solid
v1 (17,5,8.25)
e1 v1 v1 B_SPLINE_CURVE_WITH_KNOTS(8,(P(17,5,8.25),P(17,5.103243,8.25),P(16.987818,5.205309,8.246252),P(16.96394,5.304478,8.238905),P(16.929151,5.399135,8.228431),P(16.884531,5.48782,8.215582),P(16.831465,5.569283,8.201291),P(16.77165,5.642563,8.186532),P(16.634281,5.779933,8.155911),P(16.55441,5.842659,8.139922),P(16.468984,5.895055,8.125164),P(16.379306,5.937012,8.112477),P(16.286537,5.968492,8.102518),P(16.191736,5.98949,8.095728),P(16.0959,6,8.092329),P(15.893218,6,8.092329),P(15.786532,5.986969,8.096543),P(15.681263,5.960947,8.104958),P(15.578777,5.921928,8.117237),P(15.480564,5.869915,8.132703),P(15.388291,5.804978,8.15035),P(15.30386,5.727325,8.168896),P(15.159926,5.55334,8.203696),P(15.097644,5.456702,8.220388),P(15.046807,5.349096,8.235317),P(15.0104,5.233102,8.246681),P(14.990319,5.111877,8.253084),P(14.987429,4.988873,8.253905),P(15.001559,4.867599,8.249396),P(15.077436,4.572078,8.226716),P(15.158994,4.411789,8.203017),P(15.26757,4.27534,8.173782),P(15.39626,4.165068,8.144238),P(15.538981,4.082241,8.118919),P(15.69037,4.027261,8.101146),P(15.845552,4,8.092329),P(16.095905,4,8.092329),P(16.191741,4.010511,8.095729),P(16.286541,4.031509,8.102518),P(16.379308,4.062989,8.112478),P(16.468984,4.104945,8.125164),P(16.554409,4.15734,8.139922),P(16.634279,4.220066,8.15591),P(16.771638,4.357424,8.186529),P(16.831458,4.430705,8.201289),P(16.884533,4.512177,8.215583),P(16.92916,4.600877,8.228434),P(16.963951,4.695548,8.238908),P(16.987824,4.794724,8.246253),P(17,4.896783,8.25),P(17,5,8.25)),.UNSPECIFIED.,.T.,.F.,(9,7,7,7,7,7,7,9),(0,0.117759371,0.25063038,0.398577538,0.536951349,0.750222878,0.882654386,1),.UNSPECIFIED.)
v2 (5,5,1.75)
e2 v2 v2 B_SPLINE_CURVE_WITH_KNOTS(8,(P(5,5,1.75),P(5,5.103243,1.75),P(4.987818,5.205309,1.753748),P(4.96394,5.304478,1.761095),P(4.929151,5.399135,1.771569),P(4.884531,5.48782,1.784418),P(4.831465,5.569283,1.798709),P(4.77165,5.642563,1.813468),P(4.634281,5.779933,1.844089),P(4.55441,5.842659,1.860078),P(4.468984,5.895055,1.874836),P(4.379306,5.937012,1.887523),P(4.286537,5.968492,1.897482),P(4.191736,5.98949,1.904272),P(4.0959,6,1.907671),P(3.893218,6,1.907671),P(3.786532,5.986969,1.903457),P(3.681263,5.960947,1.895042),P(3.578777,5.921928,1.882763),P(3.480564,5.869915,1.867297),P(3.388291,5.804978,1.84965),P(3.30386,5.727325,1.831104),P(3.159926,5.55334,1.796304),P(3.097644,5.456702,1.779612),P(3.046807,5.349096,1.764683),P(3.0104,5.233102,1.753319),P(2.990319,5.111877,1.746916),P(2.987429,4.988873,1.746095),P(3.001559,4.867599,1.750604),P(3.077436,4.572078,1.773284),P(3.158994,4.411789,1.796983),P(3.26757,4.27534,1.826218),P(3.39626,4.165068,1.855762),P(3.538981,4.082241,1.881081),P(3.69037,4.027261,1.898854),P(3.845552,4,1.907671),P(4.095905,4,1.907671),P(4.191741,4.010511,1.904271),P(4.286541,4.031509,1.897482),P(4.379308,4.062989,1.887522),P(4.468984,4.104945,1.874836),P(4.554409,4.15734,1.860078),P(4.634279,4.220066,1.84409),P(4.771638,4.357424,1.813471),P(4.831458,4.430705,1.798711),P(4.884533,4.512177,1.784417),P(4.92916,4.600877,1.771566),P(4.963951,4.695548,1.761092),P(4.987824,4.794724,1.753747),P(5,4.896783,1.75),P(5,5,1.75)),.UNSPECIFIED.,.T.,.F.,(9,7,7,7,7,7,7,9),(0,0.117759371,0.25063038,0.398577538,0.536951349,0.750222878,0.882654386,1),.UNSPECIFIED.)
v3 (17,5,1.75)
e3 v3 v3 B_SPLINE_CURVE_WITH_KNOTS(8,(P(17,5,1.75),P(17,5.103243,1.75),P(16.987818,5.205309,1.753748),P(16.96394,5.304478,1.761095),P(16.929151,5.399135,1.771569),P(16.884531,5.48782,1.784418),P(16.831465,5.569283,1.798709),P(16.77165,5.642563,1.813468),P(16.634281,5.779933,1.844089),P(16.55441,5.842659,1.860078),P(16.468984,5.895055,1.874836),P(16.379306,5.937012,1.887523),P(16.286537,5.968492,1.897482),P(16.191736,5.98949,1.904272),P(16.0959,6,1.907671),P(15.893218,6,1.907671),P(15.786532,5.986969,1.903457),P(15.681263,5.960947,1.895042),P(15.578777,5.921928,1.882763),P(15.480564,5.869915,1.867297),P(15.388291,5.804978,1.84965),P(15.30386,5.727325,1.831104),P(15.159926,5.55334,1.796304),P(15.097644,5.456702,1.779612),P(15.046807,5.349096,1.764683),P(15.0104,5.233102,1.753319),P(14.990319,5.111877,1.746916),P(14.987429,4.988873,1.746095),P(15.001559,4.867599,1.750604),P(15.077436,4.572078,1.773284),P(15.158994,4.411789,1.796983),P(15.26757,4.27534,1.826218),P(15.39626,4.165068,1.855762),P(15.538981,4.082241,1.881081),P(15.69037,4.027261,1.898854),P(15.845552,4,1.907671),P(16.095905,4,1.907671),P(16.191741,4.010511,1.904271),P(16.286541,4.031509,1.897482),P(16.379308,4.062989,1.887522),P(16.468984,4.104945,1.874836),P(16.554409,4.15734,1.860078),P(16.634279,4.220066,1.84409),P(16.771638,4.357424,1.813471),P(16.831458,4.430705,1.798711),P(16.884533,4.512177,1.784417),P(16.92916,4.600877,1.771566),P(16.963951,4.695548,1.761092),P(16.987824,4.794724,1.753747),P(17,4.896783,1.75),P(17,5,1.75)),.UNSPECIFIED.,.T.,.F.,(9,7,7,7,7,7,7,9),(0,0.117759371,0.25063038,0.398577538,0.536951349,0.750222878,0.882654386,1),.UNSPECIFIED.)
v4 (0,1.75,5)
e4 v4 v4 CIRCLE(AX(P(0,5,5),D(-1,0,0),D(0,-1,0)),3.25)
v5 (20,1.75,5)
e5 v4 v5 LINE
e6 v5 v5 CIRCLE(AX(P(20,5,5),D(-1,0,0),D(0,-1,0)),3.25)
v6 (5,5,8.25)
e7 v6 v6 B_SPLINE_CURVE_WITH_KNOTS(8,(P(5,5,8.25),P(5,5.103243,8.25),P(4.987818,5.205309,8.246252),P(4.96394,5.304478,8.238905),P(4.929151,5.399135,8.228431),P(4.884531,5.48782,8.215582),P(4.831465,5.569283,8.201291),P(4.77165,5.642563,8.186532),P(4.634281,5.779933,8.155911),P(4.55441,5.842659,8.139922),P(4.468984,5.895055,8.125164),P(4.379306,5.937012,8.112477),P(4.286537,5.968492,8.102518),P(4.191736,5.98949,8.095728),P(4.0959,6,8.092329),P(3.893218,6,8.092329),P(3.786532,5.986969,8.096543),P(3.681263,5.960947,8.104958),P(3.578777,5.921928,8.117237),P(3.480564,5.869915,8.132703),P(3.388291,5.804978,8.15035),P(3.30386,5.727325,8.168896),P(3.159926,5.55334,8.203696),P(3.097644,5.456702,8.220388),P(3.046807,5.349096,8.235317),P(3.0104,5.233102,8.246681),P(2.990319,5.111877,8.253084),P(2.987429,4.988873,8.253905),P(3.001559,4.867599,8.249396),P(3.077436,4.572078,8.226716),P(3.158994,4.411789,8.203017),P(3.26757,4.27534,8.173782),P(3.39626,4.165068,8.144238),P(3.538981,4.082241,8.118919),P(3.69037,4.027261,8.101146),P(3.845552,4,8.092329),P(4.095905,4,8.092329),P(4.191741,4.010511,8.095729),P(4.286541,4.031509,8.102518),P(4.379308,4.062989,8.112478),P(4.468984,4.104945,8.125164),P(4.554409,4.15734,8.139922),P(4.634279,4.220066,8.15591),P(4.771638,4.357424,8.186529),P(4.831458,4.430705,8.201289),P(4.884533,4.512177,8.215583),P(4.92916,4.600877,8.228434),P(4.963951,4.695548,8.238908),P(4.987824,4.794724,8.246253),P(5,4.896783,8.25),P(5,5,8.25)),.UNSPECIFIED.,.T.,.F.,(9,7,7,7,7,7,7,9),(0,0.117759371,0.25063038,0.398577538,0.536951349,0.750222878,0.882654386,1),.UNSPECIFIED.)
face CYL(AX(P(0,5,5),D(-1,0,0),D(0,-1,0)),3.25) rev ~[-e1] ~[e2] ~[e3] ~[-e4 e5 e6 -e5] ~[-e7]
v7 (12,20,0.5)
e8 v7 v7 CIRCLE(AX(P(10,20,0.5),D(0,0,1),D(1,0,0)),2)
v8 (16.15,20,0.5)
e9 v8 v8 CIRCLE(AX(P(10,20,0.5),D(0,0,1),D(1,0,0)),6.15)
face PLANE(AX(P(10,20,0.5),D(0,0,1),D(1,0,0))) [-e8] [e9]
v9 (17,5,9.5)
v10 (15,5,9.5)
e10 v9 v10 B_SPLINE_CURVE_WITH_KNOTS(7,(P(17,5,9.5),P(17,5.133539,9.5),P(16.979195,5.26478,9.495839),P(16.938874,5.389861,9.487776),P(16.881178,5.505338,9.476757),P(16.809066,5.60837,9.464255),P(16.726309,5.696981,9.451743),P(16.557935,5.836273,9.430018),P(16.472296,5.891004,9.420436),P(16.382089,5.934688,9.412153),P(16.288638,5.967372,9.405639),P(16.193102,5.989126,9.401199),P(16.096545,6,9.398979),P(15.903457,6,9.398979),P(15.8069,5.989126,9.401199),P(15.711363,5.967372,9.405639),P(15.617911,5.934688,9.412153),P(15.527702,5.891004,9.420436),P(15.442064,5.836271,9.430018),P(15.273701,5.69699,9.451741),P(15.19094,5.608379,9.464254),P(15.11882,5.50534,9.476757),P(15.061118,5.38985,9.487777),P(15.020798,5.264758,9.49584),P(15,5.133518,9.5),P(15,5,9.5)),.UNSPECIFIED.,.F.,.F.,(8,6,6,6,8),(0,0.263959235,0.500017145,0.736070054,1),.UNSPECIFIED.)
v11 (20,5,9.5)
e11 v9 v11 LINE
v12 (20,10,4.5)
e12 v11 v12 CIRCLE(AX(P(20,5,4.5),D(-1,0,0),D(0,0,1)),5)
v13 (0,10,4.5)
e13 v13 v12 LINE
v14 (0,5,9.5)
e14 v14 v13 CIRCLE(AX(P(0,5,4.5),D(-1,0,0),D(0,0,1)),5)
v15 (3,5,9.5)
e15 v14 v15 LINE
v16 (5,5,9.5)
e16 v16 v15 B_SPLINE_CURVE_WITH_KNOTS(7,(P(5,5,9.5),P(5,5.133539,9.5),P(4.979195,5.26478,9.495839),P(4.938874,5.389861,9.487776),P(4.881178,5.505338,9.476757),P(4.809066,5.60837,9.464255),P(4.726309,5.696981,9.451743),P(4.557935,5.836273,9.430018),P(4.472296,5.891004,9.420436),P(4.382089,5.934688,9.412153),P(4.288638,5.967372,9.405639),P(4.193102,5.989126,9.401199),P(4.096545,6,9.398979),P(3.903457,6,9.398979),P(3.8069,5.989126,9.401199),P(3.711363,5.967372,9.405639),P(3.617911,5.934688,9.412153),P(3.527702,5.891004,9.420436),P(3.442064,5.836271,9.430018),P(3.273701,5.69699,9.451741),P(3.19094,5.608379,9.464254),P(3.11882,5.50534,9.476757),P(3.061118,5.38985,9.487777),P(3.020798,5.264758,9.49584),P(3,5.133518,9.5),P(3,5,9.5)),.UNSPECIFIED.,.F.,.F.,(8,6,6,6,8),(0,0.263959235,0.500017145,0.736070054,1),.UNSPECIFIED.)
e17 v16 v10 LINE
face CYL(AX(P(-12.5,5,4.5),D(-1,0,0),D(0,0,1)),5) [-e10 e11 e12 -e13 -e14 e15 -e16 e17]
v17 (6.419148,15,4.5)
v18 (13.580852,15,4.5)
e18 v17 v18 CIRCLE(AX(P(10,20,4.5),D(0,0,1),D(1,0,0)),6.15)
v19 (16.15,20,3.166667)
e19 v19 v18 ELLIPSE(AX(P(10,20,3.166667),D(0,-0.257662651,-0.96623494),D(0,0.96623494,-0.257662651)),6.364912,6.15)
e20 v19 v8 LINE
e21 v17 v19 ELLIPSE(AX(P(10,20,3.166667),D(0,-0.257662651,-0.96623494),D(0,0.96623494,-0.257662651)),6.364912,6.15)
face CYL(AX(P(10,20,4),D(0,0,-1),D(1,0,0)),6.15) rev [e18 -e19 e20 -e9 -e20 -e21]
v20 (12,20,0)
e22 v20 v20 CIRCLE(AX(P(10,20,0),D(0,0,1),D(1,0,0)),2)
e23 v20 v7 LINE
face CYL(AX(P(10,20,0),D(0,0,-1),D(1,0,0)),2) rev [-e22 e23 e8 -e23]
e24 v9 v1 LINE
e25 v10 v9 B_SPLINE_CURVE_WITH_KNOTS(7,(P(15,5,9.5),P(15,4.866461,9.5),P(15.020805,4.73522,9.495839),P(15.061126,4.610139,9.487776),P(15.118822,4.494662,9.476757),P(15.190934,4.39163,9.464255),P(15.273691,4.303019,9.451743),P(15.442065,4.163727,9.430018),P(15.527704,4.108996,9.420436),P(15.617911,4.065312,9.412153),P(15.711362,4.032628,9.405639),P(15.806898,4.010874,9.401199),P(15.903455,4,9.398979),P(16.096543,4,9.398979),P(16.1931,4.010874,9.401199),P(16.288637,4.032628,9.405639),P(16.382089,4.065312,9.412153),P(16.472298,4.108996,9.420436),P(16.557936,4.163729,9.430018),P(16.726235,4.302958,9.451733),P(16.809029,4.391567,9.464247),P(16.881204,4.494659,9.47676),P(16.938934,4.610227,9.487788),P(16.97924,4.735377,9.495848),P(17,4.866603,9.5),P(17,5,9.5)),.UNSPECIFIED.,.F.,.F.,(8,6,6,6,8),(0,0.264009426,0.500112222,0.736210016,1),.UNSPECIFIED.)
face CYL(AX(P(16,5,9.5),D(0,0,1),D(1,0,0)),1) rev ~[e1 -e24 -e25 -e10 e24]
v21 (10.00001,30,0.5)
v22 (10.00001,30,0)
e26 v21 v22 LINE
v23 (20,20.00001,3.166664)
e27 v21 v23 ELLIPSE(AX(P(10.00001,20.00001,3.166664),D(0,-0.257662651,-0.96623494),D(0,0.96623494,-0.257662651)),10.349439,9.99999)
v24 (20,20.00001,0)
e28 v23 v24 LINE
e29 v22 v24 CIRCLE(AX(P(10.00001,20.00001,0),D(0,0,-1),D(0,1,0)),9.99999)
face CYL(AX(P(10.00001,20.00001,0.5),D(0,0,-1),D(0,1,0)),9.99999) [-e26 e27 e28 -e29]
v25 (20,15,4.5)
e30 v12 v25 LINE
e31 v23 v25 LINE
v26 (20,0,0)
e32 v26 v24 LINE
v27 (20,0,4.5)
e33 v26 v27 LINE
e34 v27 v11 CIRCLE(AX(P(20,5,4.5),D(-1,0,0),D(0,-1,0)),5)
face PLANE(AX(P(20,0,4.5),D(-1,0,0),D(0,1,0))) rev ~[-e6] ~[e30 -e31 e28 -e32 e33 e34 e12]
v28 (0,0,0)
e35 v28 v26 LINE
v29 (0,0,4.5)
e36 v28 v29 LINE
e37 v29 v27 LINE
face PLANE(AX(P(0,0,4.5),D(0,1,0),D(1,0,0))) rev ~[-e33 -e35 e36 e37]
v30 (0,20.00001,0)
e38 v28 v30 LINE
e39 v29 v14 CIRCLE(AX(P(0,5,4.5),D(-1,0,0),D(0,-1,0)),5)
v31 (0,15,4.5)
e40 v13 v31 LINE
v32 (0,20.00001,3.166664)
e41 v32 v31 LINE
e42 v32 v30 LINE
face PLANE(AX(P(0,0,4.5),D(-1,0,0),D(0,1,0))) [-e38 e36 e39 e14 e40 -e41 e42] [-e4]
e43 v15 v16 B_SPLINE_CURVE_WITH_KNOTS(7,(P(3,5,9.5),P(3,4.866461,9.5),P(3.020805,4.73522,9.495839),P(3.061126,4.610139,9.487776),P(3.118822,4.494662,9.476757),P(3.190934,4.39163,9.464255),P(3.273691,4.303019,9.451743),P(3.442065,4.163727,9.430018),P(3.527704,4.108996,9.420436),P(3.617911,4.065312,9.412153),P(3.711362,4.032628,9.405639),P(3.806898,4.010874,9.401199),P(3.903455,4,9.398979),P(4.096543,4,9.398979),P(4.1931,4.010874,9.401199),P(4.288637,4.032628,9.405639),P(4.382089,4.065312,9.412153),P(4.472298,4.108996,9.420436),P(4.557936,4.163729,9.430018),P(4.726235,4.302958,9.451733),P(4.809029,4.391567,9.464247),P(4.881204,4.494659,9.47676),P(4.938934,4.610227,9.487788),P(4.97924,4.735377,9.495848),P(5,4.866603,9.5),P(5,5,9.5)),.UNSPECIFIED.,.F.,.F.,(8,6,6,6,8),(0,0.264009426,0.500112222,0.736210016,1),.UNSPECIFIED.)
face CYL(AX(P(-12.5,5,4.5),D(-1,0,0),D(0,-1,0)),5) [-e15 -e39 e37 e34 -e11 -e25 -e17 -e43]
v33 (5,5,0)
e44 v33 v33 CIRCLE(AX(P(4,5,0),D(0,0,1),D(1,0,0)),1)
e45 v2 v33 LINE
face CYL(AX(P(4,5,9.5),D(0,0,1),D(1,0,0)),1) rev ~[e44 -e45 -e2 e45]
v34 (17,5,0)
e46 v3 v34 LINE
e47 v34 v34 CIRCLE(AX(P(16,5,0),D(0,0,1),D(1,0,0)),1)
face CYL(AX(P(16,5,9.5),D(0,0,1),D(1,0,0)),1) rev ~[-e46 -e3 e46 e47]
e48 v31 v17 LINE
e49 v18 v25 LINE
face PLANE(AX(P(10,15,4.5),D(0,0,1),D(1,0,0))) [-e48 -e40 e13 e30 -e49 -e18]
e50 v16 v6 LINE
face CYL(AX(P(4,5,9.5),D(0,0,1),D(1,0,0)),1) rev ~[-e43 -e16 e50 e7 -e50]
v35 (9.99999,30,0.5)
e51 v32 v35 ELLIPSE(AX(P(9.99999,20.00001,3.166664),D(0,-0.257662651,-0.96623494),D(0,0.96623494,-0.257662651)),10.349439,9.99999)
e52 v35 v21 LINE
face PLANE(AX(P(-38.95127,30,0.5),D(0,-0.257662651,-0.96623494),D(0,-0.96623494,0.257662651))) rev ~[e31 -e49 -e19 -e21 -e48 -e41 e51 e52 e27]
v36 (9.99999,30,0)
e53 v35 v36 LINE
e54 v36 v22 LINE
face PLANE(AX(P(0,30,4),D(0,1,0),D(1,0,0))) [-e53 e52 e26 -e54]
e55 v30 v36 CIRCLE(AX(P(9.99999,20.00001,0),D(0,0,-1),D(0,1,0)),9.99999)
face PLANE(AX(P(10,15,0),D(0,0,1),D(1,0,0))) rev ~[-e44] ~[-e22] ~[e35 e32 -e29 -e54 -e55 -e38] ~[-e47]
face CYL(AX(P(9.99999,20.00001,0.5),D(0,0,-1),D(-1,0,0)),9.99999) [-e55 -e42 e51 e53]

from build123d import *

# Parameters (mm, degrees)
F0_W         = 20
F0_H         = 30
F0_R         = 6.15
F1_DEPTH     = 4
F1_FACE_W    = 20
F1_FACE_H    = 30
F1_FACE_R    = 6.15
F0_R_2       = 2
F2_DEPTH     = 0.5
F3_W         = 20
F3_H         = 10
F4_DEPTH     = 5
F5_R         = 3.25
F6_DEPTH     = 25
F7_T1_DEPTH  = 97.9025398997
F8_R         = 9.99999
F9_R         = 1
F10_DEPTH    = 25
F11_T1_DEPTH = 45


# Not quite as in the source:
# - a fillet or chamfer that OpenCascade refuses, or shapes differently, is made with other operations: its cross-section is extruded or revolved along the edge and cut away or added
# - a fillet or chamfer is up to 0.001 mm smaller than in the source, because OpenCascade refuses the exact size
# - a feature names something its author has since deleted; it is built from what else it names


with BuildPart() as f1:
    # F0 (on Top) → F1 (new body)
    with BuildSketch(Plane.XY):
        with Locations((10, 15)):
            Rectangle(F0_W, F0_H)
        with Locations((10, 20)):
            Circle(F0_R, mode=Mode.SUBTRACT)
    extrude(amount=F1_DEPTH)

    # F1_face (on face) + F0 (on Top) → F2 (join)
    with BuildSketch(Plane(origin=(10, 13.7652894827, 4), x_dir=(1, 0, 0), z_dir=(0, 0, 1))):
        with Locations((0, 1.2347105173)):
            Rectangle(F1_FACE_W, F1_FACE_H)
        with Locations((0, 6.2347105173)):
            Circle(F1_FACE_R, mode=Mode.SUBTRACT)
    with BuildSketch(Plane.XY):
        with Locations((10, 20)):
            Circle(F0_R)
        with Locations((10, 20)):
            Circle(F0_R_2, mode=Mode.SUBTRACT)
    extrude(amount=F2_DEPTH)

    # F3 (on face) → F4 (join)
    with BuildSketch(Plane.XY.offset(4.5)):
        with Locations((10, 5)):
            Rectangle(F3_W, F3_H)
    extrude(amount=F4_DEPTH)

    # F5 (on face) → F6 (cut)
    with BuildSketch(Plane(origin=(0, 0, 0), x_dir=(0, -1, 0), z_dir=(-1, 0, 0))):
        with Locations((-5, 5)):
            Circle(F5_R)
    extrude(amount=-F6_DEPTH, mode=Mode.SUBTRACT)

    # F7: chamfer of 4 x 15 on 1 edges, made by hand

    # F7_s2 → F7_t1 (cut)
    with BuildSketch(Plane.YZ.offset(-38.9512699498)):
        Polygon((30, 0.5), (15, 4.5), (30, 4.5), align=None)
    extrude(amount=F7_T1_DEPTH, mode=Mode.SUBTRACT)

    # F8 (radius 10 in the source; OpenCascade refuses exactly that, so slightly less here)
    f8_edges = [f1.edges().sort_by_distance(p)[0] for p in [
        (0, 30, 0.25),
        (20, 30, 0.25),
    ]]
    fillet(f8_edges, radius=F8_R)

    # F9 (on face) → F10 (cut)
    with BuildSketch(Plane.XY.offset(9.5)):
        with Locations((4, 5)):
            Circle(F9_R)
        with Locations((16, 5)):
            Circle(F9_R)
    extrude(amount=-F10_DEPTH, mode=Mode.SUBTRACT)

    # F11: fillet of radius 5 on 2 edges, made by hand

    # F11_s2 → F11_t1 (cut)
    with BuildSketch(Plane.YZ.offset(-12.5)):
        with BuildLine():
            ThreePointArc((0, 4.5), (1.4644660941, 8.0355339059), (5, 9.5))
            Line((5, 9.5), (0, 9.5))
            Line((0, 9.5), (0, 4.5))
        make_face()
        with BuildLine():
            ThreePointArc((5, 9.5), (8.5355339059, 8.0355339059), (10, 4.5))
            Line((10, 4.5), (10, 9.5))
            Line((10, 9.5), (5, 9.5))
        make_face()
    extrude(amount=F11_T1_DEPTH, mode=Mode.SUBTRACT)


solid = f1.part
